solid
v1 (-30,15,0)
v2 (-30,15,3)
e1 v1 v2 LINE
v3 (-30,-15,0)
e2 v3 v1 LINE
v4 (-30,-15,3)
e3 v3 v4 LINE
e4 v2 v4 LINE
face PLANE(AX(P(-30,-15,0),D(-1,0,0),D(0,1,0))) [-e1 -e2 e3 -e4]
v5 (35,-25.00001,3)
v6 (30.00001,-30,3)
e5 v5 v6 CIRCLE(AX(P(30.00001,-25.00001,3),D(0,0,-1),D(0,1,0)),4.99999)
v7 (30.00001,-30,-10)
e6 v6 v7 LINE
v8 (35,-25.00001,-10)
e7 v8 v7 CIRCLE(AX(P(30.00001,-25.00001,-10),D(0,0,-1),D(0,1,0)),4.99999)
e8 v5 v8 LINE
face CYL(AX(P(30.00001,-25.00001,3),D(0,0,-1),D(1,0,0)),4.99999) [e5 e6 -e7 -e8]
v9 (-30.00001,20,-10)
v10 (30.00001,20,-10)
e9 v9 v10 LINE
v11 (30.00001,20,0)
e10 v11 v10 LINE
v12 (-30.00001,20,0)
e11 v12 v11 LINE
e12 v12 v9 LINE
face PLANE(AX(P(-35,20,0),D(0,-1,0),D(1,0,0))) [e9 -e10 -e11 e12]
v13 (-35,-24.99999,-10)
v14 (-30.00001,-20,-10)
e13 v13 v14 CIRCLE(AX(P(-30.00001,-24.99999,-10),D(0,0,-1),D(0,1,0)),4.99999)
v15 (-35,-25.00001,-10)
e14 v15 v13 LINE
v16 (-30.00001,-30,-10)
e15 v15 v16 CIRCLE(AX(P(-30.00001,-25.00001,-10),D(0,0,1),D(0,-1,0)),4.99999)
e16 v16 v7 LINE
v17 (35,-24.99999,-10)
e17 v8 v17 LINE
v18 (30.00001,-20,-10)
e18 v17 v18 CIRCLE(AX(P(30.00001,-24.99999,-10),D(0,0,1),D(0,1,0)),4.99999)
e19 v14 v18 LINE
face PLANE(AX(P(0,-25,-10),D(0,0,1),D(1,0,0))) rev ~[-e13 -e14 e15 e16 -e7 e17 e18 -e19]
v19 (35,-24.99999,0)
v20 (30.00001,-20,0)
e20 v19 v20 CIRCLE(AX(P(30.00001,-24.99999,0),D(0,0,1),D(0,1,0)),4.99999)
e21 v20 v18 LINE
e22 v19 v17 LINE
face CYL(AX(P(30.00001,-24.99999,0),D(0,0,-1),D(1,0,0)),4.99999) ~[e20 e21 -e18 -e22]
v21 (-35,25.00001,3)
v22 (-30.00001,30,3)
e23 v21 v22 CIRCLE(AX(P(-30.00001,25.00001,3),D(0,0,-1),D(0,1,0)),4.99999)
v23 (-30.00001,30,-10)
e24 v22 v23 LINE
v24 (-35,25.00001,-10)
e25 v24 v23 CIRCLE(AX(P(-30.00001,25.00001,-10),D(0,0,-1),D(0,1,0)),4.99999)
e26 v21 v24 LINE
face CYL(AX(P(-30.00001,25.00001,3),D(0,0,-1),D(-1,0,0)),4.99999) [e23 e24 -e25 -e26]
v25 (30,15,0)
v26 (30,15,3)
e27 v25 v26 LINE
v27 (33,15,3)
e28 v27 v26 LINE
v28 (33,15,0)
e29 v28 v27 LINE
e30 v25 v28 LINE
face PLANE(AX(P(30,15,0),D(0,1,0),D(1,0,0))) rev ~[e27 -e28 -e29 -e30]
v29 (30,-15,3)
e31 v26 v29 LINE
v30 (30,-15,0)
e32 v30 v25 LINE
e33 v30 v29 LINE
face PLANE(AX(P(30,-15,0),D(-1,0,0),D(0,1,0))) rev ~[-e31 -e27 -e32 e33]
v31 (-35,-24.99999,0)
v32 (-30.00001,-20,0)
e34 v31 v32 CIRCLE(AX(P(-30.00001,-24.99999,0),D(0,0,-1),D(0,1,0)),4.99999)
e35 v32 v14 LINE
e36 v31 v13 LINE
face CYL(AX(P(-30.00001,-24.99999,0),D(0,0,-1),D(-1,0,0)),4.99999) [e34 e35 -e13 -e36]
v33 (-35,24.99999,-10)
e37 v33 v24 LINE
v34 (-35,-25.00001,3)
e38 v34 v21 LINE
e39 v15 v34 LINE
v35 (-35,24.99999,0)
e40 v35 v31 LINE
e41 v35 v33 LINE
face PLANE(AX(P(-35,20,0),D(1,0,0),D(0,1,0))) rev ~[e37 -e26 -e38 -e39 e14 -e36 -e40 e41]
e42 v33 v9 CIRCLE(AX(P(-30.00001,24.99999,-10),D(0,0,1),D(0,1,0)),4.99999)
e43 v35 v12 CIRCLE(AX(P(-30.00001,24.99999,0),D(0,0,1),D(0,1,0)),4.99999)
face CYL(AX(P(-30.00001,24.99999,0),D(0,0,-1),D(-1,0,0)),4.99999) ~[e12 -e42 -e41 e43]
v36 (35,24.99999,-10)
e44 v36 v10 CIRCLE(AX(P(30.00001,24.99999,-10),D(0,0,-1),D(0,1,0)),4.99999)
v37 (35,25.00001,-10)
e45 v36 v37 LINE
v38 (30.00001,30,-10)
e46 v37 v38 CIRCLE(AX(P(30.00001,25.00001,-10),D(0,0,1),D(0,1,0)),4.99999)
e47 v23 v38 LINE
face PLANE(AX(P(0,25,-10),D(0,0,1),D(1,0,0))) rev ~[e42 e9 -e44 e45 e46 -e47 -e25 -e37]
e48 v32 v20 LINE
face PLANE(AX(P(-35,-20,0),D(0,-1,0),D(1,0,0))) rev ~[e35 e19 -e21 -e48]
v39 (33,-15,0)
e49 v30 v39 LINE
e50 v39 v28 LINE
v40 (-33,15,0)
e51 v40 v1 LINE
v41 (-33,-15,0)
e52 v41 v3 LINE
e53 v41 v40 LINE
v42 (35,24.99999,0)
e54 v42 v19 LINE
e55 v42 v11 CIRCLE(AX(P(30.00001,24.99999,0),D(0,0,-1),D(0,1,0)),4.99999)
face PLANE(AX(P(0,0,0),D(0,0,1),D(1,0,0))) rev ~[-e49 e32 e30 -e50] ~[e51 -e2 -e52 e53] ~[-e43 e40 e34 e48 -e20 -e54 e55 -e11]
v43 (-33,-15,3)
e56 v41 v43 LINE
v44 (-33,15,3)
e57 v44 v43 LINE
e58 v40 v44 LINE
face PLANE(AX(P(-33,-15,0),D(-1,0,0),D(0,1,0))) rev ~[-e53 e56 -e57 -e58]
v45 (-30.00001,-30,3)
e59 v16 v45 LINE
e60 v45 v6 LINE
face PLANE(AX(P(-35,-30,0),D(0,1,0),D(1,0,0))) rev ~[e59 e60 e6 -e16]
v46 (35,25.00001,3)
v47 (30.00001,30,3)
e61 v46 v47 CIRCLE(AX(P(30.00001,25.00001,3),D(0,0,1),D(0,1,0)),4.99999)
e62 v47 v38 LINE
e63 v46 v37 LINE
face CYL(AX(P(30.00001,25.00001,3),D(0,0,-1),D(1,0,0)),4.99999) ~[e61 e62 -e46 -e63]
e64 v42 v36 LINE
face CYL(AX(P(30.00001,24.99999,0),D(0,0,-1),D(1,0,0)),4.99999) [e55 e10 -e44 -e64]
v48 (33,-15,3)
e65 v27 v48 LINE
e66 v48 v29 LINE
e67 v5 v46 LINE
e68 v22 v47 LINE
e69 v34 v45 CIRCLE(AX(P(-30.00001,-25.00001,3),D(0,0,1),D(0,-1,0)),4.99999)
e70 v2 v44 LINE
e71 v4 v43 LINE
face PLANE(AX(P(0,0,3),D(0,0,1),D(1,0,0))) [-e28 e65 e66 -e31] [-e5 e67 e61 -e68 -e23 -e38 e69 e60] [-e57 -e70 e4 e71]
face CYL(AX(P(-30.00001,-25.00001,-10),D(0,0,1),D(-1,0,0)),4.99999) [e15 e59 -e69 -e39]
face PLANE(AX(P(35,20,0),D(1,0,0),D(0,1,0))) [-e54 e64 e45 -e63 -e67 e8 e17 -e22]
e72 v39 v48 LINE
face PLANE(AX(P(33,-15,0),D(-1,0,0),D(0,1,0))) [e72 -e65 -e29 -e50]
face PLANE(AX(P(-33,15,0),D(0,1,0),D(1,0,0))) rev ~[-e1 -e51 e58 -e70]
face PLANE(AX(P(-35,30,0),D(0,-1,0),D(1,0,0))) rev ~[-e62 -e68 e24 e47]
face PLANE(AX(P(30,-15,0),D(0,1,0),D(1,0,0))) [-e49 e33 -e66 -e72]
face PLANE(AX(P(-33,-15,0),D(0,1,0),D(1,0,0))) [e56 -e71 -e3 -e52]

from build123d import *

# Parameters (mm, degrees)
F0_W     = 70
F0_H     = 60
F1_DEPTH = 3
F2_W     = 3
F2_H     = 30
F3_DEPTH = 25
F4_W     = 70
F4_H     = 10
F5_DEPTH = 10
F6_R     = 4.99999


# Not quite as in the source:
# - a fillet or chamfer is up to 0.001 mm smaller than in the source, because OpenCascade refuses the exact size


with BuildPart() as f1:
    # F0 (on Top) → F1 (new body)
    with BuildSketch(Plane.XY):
        Rectangle(F0_W, F0_H)
    extrude(amount=F1_DEPTH)

    # F2 (on Top) → F3 (cut)
    with BuildSketch(Plane.XY):
        with Locations((31.5, 0)):
            Rectangle(F2_W, F2_H)
        with Locations((-31.5, 0)):
            Rectangle(F2_W, F2_H)
    extrude(amount=F3_DEPTH, mode=Mode.SUBTRACT)

    # F4 (on Top) → F5 (join)
    with BuildSketch(Plane.XY):
        with Locations((0, 25)):
            Rectangle(F4_W, F4_H)
        with Locations((0, -25)):
            Rectangle(F4_W, F4_H)
    extrude(amount=-F5_DEPTH)

    # F6 (radius 5 in the source; OpenCascade refuses exactly that, so slightly less here)
    f6_edges = [f1.edges().sort_by_distance(p)[0] for p in [
        (35, -30, -3.5),
        (-35, -30, -3.5),
        (-35, -20, -5),
        (35, -20, -5),
        (35, 20, -5),
        (35, 30, -3.5),
        (-35, 20, -5),
        (-35, 30, -3.5),
    ]]
    fillet(f6_edges, radius=F6_R)


solid = f1.part
